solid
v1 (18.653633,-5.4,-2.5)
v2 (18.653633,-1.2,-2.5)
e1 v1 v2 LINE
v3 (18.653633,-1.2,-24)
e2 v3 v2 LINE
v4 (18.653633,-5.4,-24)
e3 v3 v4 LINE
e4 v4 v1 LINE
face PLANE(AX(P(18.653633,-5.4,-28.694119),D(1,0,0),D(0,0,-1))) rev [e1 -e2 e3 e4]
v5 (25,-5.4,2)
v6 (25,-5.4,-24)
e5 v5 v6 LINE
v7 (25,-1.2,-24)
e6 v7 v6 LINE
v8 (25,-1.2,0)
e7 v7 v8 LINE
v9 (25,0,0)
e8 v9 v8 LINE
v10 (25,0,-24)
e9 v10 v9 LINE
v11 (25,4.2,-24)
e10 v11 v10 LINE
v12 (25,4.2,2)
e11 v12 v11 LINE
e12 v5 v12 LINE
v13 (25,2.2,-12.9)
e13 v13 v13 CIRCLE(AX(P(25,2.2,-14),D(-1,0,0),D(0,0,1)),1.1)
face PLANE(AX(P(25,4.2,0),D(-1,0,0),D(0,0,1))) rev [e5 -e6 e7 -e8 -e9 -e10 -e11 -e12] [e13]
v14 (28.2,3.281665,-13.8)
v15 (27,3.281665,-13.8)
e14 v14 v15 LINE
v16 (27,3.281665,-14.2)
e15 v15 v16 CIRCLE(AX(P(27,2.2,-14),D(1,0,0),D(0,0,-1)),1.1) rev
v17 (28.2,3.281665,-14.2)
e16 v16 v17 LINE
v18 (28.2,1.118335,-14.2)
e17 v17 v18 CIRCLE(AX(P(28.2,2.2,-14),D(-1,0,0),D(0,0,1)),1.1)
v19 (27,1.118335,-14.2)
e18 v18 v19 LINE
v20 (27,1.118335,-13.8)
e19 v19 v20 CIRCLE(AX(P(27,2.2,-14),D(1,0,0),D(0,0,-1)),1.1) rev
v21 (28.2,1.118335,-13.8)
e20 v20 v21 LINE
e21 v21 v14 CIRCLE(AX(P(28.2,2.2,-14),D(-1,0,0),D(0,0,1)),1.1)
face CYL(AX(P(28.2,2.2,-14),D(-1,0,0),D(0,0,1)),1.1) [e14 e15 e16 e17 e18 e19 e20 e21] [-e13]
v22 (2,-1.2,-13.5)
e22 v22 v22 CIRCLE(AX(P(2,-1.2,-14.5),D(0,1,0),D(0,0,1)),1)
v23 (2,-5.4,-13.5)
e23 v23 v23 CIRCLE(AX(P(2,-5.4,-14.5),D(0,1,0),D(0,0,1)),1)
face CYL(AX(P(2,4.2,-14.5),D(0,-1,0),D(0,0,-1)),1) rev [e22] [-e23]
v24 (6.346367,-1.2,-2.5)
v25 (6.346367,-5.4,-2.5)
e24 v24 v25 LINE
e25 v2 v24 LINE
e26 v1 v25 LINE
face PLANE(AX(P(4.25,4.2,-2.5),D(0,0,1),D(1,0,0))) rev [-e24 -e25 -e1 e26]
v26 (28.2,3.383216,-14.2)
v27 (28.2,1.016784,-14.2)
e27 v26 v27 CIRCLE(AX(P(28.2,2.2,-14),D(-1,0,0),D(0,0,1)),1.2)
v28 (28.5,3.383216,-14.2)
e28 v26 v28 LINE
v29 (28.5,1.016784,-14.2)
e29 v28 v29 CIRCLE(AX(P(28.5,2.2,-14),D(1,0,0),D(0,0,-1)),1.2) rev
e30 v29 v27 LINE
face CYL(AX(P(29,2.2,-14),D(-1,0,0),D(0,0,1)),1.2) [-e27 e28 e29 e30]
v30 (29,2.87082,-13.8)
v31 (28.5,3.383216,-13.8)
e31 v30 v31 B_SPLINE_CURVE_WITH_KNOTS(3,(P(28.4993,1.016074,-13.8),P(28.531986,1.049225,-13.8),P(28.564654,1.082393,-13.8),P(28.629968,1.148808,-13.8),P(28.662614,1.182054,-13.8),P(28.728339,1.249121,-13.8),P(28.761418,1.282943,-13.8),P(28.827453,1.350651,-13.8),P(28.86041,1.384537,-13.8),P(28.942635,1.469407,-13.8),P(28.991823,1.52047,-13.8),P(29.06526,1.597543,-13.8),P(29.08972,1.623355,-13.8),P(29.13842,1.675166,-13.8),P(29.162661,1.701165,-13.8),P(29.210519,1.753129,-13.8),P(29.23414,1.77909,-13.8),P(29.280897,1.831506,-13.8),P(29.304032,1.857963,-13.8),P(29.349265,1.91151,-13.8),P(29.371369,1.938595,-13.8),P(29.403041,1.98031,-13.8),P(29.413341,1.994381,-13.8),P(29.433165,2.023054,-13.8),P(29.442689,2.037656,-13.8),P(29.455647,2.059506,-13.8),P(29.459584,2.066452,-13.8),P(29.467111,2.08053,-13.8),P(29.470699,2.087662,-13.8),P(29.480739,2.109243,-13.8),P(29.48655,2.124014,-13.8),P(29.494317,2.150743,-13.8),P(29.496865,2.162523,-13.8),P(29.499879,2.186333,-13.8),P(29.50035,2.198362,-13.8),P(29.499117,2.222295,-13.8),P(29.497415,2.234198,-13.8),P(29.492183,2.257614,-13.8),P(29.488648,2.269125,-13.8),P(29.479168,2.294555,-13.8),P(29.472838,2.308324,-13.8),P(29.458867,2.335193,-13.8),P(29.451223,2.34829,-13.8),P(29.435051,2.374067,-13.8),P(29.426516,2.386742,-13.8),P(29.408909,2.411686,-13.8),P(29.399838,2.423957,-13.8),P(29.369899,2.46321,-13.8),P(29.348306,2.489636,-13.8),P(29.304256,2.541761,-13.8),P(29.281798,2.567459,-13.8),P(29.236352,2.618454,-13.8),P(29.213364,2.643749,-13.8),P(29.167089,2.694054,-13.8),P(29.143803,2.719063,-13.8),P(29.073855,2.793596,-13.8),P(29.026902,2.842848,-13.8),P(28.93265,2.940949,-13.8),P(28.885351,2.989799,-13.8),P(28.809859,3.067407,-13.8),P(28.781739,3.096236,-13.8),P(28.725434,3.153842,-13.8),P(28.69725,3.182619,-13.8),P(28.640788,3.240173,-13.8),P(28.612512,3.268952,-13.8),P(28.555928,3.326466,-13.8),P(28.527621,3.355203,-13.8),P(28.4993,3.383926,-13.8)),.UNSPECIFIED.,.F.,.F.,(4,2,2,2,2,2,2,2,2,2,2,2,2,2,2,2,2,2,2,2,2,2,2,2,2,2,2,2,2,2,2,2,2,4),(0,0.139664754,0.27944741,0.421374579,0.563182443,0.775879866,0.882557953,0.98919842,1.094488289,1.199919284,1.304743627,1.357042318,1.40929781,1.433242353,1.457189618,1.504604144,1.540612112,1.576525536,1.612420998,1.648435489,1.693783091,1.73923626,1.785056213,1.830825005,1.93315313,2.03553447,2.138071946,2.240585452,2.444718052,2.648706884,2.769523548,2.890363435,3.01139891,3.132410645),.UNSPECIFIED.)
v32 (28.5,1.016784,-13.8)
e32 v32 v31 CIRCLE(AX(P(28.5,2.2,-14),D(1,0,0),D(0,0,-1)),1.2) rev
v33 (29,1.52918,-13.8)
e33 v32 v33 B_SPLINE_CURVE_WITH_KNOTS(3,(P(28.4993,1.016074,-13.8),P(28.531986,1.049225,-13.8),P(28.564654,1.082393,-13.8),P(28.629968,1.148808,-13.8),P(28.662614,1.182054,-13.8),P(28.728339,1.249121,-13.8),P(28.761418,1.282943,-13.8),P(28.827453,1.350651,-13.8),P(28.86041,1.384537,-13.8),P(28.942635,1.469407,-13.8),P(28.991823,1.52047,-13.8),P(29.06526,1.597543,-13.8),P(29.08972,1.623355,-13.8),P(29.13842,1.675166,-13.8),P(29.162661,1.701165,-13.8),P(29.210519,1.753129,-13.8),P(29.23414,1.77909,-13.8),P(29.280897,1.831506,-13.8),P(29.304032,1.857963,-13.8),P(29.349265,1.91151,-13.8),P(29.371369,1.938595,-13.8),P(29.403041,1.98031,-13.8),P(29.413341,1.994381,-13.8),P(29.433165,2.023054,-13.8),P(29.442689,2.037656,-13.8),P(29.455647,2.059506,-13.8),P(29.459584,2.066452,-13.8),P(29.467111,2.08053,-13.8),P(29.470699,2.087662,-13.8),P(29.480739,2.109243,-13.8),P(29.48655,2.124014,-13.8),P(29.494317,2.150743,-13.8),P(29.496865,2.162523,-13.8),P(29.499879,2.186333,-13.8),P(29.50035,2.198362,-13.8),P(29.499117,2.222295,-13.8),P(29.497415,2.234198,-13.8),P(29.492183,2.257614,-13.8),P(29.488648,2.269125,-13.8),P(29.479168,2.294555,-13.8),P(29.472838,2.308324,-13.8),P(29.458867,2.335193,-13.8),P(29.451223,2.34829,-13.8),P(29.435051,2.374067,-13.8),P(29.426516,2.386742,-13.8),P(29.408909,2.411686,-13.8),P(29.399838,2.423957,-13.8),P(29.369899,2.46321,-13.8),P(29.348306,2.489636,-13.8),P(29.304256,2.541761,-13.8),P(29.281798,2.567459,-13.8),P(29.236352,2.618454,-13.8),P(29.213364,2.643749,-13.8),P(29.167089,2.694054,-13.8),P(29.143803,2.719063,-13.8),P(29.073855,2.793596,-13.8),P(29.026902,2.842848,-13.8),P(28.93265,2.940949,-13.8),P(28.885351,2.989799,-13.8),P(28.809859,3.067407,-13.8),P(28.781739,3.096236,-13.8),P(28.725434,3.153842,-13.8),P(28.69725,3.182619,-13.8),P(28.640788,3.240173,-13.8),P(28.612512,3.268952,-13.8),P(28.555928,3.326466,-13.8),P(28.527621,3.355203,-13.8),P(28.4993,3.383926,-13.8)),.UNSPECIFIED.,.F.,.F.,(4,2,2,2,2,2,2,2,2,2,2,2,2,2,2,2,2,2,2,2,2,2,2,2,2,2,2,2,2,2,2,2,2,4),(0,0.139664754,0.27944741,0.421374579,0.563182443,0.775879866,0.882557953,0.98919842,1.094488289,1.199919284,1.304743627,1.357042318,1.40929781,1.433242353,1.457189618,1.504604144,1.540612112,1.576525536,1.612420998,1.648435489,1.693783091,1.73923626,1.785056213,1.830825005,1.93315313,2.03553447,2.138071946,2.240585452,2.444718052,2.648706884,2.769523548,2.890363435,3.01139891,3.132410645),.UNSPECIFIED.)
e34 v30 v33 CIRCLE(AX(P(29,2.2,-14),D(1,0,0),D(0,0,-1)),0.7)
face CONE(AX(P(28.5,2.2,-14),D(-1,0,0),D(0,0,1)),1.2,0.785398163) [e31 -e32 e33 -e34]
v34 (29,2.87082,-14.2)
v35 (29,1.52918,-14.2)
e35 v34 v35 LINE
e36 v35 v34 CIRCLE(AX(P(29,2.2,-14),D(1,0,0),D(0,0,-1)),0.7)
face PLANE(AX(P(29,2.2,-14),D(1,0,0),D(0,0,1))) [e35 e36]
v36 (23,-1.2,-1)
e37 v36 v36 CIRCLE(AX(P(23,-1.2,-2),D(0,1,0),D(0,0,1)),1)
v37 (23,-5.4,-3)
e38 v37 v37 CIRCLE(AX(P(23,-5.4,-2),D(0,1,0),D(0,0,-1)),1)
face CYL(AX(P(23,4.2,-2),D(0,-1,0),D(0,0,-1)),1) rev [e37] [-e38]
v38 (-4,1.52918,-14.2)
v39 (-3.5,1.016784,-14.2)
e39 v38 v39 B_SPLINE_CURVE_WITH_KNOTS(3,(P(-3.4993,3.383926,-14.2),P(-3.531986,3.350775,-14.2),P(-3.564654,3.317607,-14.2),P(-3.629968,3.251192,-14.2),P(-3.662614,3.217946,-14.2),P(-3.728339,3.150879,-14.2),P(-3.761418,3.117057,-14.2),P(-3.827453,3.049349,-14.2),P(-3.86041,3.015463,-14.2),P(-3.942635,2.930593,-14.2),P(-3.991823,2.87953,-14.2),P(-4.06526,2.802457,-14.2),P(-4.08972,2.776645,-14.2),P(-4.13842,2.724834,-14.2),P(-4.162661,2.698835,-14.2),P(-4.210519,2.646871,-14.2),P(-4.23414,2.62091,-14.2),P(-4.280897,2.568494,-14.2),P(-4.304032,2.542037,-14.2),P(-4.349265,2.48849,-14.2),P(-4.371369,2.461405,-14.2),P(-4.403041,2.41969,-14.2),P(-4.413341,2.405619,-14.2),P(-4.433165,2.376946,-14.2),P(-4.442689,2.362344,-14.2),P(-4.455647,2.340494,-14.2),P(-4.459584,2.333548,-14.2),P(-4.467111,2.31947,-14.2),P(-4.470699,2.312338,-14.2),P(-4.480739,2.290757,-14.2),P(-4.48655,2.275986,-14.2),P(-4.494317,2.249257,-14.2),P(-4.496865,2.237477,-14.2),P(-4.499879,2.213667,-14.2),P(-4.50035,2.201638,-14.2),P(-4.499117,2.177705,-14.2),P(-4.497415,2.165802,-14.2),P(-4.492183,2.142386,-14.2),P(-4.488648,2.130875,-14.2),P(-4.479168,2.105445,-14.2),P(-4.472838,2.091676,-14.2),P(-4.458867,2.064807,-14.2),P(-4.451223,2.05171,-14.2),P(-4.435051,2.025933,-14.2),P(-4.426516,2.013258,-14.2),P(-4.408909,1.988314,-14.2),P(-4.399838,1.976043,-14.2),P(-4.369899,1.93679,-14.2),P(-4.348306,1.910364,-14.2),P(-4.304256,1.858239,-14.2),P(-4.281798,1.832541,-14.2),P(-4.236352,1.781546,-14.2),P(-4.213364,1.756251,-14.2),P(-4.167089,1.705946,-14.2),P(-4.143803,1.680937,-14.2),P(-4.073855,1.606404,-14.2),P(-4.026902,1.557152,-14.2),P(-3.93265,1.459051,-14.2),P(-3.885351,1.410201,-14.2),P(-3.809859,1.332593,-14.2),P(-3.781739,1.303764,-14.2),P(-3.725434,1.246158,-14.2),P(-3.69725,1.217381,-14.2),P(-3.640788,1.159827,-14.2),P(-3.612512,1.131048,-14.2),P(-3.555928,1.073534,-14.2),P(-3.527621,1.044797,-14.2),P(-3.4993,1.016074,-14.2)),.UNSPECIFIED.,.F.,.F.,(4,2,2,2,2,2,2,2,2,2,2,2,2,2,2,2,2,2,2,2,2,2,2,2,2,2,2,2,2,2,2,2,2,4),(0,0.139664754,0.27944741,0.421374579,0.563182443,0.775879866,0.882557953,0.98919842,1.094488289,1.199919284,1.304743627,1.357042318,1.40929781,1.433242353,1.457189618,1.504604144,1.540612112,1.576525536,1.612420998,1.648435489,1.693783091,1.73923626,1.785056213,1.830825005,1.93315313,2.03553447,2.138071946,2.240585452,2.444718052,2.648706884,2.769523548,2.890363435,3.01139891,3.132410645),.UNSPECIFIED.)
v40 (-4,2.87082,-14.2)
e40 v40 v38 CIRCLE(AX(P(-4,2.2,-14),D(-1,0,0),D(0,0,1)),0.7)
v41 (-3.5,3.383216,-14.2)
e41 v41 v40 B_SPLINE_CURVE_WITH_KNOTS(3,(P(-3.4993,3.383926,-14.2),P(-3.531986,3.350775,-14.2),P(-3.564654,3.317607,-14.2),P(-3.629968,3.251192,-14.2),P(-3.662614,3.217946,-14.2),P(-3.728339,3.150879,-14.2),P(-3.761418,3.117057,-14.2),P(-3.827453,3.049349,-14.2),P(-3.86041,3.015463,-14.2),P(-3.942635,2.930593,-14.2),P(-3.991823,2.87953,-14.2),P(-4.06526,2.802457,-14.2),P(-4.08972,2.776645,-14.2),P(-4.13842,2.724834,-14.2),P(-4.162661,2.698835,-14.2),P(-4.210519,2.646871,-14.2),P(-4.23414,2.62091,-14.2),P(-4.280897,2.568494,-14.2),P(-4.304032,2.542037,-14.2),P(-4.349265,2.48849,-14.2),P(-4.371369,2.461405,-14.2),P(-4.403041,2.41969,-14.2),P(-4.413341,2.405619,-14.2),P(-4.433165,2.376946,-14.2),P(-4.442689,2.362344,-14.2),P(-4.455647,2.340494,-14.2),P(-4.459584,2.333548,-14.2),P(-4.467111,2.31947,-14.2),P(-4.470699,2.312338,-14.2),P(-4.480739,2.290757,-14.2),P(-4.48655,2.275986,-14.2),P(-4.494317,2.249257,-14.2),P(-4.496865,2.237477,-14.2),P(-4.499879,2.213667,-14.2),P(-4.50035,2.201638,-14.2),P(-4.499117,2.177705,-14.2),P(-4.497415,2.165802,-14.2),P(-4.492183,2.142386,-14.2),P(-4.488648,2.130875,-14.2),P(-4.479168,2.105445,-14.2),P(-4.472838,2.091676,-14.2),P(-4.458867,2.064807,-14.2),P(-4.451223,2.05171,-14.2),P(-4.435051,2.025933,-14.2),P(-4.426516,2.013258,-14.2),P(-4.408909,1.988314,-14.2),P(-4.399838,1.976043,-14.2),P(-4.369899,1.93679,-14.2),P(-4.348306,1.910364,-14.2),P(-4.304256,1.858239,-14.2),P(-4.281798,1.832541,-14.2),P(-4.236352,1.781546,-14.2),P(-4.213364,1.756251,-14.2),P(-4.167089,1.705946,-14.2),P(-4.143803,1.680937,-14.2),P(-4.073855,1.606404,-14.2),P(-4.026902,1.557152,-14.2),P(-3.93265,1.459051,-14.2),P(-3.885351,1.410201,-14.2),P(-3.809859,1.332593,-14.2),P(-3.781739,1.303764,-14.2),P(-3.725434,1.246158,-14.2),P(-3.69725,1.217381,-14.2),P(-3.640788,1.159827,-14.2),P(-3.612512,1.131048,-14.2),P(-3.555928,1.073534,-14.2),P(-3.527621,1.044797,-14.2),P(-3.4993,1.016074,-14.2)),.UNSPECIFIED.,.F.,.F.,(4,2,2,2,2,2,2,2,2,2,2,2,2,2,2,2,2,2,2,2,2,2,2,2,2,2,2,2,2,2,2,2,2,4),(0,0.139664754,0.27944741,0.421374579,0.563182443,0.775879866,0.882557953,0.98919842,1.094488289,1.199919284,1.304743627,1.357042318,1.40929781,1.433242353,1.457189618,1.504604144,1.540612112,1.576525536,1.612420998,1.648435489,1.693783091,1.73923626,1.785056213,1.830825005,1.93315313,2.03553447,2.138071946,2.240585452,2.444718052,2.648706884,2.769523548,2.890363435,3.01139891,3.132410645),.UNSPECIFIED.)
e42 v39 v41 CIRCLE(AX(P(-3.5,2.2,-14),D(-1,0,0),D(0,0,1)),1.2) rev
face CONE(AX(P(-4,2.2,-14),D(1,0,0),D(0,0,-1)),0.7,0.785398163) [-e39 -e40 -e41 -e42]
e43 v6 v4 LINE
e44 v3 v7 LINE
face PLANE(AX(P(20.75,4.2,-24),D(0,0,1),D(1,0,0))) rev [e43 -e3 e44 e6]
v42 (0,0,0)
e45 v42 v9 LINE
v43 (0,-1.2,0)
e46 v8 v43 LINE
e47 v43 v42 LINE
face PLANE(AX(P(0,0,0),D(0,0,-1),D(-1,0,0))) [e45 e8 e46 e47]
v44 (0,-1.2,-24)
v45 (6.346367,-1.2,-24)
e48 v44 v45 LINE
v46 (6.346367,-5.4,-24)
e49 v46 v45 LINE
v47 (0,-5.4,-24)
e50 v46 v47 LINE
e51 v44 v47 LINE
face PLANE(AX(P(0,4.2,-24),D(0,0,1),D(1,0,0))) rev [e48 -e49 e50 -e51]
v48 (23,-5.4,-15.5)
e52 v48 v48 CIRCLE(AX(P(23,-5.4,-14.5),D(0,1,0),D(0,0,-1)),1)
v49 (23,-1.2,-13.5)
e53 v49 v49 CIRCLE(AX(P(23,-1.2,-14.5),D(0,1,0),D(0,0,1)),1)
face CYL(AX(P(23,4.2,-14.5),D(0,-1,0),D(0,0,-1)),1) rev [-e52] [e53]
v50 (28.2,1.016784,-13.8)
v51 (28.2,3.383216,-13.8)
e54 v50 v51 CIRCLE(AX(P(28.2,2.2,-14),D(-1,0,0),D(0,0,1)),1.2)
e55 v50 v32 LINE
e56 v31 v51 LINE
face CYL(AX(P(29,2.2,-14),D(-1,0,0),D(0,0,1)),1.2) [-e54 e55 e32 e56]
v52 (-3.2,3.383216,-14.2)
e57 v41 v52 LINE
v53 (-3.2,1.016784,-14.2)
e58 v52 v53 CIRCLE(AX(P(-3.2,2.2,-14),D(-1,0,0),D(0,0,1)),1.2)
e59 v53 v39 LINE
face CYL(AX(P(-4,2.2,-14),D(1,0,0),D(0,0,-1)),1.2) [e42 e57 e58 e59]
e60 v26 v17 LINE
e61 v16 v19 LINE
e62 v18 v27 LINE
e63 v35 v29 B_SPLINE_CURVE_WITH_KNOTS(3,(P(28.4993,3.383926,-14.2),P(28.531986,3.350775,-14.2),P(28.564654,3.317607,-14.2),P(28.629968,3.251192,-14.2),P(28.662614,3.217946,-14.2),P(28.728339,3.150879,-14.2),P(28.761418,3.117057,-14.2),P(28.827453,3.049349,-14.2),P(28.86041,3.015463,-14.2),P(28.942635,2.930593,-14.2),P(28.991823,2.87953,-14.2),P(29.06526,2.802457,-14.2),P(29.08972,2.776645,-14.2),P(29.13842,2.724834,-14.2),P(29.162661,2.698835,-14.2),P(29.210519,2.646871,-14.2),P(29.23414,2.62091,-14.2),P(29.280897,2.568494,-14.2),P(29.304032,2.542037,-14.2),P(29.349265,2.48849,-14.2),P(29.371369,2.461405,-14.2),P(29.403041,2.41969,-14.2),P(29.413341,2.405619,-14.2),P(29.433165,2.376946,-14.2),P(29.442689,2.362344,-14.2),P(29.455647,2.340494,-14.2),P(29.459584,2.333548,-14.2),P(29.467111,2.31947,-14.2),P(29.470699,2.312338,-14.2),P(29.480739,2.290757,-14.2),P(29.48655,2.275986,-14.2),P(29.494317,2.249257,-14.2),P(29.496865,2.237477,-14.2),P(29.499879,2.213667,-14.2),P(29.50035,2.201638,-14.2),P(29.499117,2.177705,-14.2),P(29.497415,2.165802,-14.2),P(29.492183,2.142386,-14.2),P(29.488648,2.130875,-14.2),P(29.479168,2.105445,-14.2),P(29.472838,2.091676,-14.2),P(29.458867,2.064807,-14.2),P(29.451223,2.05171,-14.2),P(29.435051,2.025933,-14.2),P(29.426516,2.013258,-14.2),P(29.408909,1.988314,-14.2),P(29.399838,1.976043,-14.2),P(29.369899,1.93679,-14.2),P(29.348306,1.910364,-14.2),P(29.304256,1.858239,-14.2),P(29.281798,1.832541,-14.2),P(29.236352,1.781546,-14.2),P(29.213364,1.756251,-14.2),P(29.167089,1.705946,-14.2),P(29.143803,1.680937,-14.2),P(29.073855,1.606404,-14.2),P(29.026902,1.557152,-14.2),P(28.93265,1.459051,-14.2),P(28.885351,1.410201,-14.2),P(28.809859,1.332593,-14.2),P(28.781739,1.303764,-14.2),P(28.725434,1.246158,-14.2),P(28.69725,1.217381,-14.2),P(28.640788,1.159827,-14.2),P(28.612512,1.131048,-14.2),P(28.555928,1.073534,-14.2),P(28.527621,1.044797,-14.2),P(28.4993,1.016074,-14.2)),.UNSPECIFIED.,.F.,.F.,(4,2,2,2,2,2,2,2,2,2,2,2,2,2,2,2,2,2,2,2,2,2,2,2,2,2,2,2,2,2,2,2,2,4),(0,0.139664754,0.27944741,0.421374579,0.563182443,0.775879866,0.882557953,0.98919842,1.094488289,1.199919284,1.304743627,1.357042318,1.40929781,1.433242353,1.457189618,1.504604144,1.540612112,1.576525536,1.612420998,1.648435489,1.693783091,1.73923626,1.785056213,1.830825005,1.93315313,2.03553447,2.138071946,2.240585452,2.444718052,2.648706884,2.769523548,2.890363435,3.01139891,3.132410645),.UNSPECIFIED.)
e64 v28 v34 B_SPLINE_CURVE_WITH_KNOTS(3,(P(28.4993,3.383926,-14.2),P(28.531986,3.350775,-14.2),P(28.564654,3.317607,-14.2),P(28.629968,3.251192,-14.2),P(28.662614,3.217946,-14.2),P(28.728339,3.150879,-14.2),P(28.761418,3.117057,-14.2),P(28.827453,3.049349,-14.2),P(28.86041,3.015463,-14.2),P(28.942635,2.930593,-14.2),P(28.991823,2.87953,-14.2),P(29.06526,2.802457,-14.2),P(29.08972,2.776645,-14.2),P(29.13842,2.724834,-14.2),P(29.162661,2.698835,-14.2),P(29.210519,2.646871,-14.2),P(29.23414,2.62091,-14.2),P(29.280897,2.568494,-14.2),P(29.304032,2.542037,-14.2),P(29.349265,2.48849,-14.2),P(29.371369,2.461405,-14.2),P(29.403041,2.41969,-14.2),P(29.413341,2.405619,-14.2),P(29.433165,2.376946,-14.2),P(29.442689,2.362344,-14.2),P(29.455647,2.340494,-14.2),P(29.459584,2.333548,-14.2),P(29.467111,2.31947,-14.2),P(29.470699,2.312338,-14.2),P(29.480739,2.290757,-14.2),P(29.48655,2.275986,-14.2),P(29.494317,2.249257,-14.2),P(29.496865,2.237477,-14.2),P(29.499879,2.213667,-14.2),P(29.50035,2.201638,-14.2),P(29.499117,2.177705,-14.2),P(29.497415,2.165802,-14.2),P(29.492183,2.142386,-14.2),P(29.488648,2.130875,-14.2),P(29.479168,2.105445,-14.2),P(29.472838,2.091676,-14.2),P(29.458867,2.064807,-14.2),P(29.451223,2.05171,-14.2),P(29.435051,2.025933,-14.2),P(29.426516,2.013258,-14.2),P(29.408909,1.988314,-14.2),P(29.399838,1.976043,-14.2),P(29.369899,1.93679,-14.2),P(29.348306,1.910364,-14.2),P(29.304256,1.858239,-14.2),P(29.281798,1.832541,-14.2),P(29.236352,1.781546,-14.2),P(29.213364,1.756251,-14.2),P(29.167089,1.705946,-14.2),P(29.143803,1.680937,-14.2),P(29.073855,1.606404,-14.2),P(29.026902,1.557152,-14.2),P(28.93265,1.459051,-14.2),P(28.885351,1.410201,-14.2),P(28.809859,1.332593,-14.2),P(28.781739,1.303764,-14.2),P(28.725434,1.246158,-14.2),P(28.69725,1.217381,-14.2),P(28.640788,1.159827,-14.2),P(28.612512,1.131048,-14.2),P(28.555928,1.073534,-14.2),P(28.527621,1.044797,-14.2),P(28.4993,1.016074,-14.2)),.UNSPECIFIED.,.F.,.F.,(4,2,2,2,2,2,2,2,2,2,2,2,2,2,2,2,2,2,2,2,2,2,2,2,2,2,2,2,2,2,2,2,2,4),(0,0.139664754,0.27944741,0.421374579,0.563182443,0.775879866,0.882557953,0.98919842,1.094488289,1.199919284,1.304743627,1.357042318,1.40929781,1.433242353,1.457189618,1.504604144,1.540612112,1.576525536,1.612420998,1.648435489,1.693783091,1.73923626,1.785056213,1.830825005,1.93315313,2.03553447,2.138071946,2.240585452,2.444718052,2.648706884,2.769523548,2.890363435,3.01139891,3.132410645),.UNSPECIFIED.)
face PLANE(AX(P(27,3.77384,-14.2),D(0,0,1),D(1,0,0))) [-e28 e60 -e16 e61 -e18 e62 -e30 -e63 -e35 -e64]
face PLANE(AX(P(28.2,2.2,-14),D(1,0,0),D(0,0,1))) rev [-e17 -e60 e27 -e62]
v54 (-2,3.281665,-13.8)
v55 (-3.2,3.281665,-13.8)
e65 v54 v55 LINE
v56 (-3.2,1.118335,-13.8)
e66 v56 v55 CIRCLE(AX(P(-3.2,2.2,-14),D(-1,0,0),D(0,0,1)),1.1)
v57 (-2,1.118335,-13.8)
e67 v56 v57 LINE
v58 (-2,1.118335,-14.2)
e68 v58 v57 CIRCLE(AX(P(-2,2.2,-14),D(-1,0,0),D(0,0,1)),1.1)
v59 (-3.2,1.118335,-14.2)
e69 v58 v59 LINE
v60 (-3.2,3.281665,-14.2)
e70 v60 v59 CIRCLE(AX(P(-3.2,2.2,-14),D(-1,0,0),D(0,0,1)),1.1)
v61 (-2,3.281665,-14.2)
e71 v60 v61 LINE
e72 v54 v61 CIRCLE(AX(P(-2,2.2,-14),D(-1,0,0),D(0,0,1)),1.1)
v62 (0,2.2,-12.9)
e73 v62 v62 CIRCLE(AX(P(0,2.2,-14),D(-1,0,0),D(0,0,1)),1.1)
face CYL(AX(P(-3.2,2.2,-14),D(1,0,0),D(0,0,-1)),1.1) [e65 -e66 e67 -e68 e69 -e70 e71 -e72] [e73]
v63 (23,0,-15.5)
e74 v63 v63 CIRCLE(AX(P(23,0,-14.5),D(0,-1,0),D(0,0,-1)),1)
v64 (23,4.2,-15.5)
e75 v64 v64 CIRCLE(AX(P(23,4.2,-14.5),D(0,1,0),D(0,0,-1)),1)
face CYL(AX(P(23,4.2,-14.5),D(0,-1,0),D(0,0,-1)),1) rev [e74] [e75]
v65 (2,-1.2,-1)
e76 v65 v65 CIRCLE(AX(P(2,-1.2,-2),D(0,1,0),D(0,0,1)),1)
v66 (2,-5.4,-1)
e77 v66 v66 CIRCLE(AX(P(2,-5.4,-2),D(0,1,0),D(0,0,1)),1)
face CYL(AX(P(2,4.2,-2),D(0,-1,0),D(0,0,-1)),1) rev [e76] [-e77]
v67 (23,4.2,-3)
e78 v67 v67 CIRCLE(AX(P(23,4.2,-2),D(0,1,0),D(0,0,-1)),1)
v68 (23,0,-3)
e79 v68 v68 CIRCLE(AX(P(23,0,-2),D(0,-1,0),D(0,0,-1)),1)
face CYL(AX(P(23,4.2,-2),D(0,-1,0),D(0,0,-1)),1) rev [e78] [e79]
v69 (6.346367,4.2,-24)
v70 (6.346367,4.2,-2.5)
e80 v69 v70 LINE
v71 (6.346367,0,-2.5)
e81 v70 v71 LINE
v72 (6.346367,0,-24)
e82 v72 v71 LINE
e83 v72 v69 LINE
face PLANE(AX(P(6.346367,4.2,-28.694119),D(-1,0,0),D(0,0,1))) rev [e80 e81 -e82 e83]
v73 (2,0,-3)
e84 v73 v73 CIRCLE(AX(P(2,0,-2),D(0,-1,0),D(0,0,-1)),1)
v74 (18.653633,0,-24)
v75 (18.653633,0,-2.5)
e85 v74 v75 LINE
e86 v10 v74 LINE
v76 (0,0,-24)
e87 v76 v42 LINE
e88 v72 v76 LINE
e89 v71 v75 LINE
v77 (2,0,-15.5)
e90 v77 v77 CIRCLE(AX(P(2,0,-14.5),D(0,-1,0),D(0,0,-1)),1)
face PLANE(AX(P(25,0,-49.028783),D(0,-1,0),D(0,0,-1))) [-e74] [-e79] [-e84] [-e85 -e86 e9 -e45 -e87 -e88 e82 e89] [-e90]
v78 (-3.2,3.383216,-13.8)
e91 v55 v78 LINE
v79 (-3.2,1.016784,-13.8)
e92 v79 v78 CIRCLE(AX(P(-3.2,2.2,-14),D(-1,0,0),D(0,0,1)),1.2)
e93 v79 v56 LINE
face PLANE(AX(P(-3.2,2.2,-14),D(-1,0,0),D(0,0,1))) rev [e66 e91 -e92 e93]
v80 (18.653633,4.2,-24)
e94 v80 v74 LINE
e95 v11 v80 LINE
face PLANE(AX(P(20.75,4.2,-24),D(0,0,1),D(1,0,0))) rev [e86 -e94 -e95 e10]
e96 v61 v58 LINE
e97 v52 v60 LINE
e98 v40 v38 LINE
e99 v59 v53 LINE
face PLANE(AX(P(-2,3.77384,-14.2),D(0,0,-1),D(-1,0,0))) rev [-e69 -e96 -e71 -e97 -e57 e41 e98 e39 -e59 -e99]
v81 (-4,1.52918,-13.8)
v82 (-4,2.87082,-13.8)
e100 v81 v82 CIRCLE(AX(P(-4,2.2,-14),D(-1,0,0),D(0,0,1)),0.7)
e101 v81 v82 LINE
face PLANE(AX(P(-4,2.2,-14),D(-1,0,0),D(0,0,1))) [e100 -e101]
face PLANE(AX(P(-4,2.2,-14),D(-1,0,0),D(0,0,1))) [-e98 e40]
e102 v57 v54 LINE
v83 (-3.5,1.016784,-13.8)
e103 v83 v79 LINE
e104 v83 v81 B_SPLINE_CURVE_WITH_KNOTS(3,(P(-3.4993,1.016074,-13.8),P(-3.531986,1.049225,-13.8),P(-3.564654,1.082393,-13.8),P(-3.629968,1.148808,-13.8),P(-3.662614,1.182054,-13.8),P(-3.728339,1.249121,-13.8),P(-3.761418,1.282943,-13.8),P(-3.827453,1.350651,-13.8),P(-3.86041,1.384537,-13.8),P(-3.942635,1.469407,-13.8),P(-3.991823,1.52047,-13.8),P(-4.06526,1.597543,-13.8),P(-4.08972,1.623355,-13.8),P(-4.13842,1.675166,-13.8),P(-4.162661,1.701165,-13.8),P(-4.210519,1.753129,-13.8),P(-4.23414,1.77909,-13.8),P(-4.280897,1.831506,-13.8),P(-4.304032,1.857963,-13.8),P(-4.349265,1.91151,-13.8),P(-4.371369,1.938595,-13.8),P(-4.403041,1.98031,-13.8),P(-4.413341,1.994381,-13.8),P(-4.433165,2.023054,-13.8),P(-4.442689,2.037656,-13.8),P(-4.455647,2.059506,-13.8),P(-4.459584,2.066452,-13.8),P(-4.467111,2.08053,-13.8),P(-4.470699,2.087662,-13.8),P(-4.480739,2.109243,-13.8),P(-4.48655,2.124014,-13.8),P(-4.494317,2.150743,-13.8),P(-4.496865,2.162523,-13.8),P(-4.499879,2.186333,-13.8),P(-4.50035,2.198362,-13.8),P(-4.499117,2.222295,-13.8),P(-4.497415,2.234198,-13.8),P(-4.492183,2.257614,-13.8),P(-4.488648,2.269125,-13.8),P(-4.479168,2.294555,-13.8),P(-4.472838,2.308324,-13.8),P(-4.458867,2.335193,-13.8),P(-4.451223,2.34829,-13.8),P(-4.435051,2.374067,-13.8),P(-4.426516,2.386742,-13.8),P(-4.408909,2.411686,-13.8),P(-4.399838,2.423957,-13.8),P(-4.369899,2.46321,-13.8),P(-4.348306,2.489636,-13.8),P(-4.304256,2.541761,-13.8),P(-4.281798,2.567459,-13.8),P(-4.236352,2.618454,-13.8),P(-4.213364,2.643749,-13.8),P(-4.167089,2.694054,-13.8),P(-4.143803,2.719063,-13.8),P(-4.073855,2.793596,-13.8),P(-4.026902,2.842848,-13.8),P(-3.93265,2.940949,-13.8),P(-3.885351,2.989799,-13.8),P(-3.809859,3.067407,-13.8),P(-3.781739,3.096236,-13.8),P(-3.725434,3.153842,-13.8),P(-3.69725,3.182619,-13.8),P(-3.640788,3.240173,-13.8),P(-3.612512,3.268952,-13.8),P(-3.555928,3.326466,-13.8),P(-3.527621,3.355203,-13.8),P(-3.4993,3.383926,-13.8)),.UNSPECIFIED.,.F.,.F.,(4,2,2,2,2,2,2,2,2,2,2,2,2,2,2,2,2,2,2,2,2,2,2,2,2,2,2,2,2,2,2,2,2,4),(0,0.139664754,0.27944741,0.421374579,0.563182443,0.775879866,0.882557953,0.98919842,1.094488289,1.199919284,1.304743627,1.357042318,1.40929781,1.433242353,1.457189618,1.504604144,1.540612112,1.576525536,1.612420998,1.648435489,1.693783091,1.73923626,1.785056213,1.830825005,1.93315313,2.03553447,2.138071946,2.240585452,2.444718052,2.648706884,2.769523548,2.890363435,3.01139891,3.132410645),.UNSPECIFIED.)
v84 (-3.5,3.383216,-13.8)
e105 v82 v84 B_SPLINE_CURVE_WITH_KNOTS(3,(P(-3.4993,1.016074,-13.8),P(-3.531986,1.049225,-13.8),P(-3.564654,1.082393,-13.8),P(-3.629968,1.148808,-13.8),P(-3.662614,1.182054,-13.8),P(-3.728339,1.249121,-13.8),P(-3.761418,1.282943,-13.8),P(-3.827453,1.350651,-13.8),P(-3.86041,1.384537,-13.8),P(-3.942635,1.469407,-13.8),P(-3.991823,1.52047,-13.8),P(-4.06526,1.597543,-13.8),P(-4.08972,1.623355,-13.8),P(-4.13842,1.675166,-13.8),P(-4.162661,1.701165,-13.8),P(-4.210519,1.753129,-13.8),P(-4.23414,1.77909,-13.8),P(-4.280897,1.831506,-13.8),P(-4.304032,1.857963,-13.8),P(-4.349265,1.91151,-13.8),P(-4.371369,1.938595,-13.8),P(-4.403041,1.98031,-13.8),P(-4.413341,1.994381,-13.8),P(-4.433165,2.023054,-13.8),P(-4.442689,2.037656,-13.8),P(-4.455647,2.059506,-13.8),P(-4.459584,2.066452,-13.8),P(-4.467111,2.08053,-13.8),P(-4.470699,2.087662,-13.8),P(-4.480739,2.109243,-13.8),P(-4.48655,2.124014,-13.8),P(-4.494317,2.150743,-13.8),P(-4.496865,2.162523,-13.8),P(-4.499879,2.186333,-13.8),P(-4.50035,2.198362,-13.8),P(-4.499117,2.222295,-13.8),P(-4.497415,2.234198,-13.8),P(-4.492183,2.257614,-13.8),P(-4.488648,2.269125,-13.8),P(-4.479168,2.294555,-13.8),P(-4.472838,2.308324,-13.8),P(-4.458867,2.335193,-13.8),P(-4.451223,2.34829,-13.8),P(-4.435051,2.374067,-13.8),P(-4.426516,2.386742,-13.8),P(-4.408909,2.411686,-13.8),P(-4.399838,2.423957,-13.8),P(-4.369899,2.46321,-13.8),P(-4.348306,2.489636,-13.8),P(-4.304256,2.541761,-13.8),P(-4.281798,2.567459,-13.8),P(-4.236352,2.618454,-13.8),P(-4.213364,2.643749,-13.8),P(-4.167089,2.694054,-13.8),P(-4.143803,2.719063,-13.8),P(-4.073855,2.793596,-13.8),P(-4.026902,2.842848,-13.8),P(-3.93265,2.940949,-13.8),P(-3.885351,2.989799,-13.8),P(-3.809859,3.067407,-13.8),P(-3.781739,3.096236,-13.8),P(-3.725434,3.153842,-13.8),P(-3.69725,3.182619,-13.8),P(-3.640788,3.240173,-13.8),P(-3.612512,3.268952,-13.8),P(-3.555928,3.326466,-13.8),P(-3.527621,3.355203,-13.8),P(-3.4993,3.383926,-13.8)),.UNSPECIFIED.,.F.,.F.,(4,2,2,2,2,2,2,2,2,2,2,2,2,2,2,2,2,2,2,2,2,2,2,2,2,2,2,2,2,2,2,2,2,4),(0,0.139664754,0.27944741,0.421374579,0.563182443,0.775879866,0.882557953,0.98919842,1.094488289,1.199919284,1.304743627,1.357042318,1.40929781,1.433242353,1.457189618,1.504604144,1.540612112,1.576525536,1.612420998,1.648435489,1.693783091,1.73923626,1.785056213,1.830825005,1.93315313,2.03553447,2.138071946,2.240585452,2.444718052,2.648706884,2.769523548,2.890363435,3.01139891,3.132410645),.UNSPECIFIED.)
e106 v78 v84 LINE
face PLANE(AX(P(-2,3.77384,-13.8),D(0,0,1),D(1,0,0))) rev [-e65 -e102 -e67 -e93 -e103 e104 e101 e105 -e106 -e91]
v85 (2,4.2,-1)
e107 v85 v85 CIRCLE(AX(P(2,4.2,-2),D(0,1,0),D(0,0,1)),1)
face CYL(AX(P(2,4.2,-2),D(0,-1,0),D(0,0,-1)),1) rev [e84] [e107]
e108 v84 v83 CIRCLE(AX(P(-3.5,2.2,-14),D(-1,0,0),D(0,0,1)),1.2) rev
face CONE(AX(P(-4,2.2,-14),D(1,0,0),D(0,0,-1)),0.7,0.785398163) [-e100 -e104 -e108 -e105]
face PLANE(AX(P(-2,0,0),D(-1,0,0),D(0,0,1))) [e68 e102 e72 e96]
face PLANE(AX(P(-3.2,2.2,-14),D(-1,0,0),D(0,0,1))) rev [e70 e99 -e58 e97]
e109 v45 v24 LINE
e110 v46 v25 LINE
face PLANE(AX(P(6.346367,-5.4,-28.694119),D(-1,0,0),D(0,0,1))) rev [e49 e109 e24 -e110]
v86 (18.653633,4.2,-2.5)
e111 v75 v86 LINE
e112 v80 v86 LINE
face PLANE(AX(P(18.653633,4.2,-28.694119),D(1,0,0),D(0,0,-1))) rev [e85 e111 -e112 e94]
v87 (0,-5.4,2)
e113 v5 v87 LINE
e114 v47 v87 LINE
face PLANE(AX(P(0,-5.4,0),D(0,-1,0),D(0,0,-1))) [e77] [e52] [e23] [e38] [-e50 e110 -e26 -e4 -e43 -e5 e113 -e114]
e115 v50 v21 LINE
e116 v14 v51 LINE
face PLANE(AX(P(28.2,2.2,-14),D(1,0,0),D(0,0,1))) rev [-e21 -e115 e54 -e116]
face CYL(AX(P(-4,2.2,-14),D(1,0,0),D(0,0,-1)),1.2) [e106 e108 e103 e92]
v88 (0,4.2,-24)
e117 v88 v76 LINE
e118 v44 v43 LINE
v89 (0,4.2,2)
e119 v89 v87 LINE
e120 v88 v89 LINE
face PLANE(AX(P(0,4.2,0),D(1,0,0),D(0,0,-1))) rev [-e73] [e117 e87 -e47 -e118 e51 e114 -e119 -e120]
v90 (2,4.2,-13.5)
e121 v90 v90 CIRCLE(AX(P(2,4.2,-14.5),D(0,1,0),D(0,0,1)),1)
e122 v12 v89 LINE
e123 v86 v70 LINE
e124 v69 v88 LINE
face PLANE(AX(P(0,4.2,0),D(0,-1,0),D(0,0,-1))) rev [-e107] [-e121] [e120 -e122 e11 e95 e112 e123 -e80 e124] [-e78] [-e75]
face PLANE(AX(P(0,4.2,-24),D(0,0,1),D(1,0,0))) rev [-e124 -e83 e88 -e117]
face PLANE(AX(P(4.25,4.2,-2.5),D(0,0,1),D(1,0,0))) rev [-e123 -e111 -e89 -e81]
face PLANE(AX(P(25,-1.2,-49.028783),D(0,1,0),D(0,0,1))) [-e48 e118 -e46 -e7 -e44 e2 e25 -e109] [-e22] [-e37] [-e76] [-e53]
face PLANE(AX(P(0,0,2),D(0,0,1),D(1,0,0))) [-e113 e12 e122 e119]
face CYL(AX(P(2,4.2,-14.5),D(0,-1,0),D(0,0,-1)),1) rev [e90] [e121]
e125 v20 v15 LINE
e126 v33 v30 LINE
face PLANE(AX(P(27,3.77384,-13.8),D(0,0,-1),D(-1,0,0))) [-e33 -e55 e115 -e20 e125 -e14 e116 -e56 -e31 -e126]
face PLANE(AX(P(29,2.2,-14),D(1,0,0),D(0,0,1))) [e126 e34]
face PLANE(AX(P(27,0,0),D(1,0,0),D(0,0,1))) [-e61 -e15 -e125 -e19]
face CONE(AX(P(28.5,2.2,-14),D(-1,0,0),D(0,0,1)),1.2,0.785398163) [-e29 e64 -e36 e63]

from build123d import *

# Parameters (mm, degrees)
SKETCH1_R           = 1
BOSS_EXTRUDE1_DEPTH = 4.2
SKETCH2_R           = 1.2
BOSS_EXTRUDE2_DEPTH = 4
SKETCH3_W           = 25
SKETCH3_H           = 4.2
BOSS_EXTRUDE3_DEPTH = 2
SKETCH4_W           = 25
SKETCH4_H           = 2
BOSS_EXTRUDE4_DEPTH = 0.6
BOSS_EXTRUDE5_START = -5.4
SKETCH1_3_R         = 1
BOSS_EXTRUDE5_DEPTH = 5.4
SKETCH4_2_W         = 25
SKETCH4_2_H         = 2
BOSS_EXTRUDE6_DEPTH = 5.4
CUT_EXTRUDE2_REACH  = 35.413
SKETCH5_W           = 25
SKETCH5_H           = 1.2
SKETCH6_W           = 2.096367106
SKETCH6_H           = 4.2
BOSS_EXTRUDE8_DEPTH = 21.5
SKETCH5_2_W         = 25
SKETCH5_2_H         = 1.2
CUT_EXTRUDE4_DEPTH  = 2.5
SKETCH8_R           = 1.2
SKETCH8_R_2         = 1.1
CUT_EXTRUDE5_DEPTH  = 3.2
CHAMFER1_SIZE       = 0.5
SKETCH10_W          = 0.4
SKETCH10_H          = 3.208969491
CUT_EXTRUDE6_DEPTH  = 2


# Read off the part's stored shape, not the designer's step: Mirror1
with BuildPart() as part:
    # Sketch1 → Boss-Extrude1 (new body)
    with BuildSketch(Plane(origin=(0, 0, 0), x_dir=(1, 0, 0), z_dir=(0, 1, 0))):
        Polygon((0, 0), (25, 0), (25, 24), (20.75, 24), (20.75, 2.5), (4.25, 2.5), (4.25, 24), (0, 24), align=None)
        with Locations(Location((2, 14.5, 0), (0, 0, 270))):
            Circle(SKETCH1_R, mode=Mode.SUBTRACT)
        with Locations(Location((2, 2, 0), (0, 0, 270))):
            Circle(SKETCH1_R, mode=Mode.SUBTRACT)
        with Locations(Location((23, 2, 0), (0, 0, 90))):
            Circle(SKETCH1_R, mode=Mode.SUBTRACT)
        with Locations(Location((23, 14.5, 0), (0, 0, 90))):
            Circle(SKETCH1_R, mode=Mode.SUBTRACT)
    extrude(amount=BOSS_EXTRUDE1_DEPTH)

    # Sketch2 → Boss-Extrude2 (add)
    with BuildSketch(Plane.ZY):
        with Locations((-14, 2.2)):
            Circle(SKETCH2_R)
    extrude(amount=BOSS_EXTRUDE2_DEPTH)

    # Sketch3 → Boss-Extrude3 (add)
    with BuildSketch(Plane.XY):
        with Locations((12.5, 2.1)):
            Rectangle(SKETCH3_W, SKETCH3_H)
    extrude(amount=BOSS_EXTRUDE3_DEPTH)

    # Sketch4 → Boss-Extrude4 (add)
    with BuildSketch(Plane.XZ):
        with Locations((12.5, 1)):
            Rectangle(SKETCH4_W, SKETCH4_H)
    extrude(amount=BOSS_EXTRUDE4_DEPTH)

    # Sketch1<3> → Boss-Extrude5 (add)
    with BuildSketch(Plane(origin=(0, 0, 0), x_dir=(1, 0, 0), z_dir=(0, 1, 0)).offset(BOSS_EXTRUDE5_START)):
        Polygon((0, 0), (25, 0), (25, 24), (20.75, 24), (20.75, 2.5), (4.25, 2.5), (4.25, 24), (0, 24), align=None)
        with Locations(Location((2, 14.5, 0), (0, 0, 270))):
            Circle(SKETCH1_3_R, mode=Mode.SUBTRACT)
        with Locations(Location((2, 2, 0), (0, 0, 270))):
            Circle(SKETCH1_3_R, mode=Mode.SUBTRACT)
        with Locations(Location((23, 2, 0), (0, 0, 90))):
            Circle(SKETCH1_3_R, mode=Mode.SUBTRACT)
        with Locations(Location((23, 14.5, 0), (0, 0, 90))):
            Circle(SKETCH1_3_R, mode=Mode.SUBTRACT)
    extrude(amount=BOSS_EXTRUDE5_DEPTH)

    # Sketch4<2> → Boss-Extrude6 (add)
    with BuildSketch(Plane.XZ):
        with Locations((12.5, 1)):
            Rectangle(SKETCH4_2_W, SKETCH4_2_H)
    extrude(amount=BOSS_EXTRUDE6_DEPTH)

    # Cut-Extrude2: up to this face of the body (flat: up to its plane)
    cut_extrude2_end = Plane(part.part.faces().sort_by_distance((22.875, -0.6, -24))[0])
    # Sketch5 → Cut-Extrude2 (cut, up to the picked face)
    with BuildSketch(Plane(origin=(0, 0, -2.5), x_dir=(-1, 0, 0), z_dir=(0, 0, -1)), mode=Mode.PRIVATE) as cut_extrude2_sk1:
        with Locations((-12.5, -0.6)):
            Rectangle(SKETCH5_W, SKETCH5_H)
    cut_extrude2_tool1 = split(extrude(cut_extrude2_sk1.sketch, amount=CUT_EXTRUDE2_REACH, mode=Mode.PRIVATE), bisect_by=cut_extrude2_end, keep=Keep.BOTH, mode=Mode.PRIVATE)
    add(cut_extrude2_tool1.solids().sort_by(Axis((12.5, -0.6, -2.5), (0, 0, -1)))[0], mode=Mode.SUBTRACT)

    # Sketch6 → Boss-Extrude8 (add)
    with BuildSketch(Plane(origin=(0, 0, -2.5), x_dir=(-1, 0, 0), z_dir=(0, 0, -1))):
        with Locations((-19.701816447, 2.1)):
            Rectangle(SKETCH6_W, SKETCH6_H)
        with Locations((-5.298183553, 2.1)):
            Rectangle(SKETCH6_W, SKETCH6_H)
        with Locations((-5.298183553, -3.3)):
            Rectangle(SKETCH6_W, SKETCH6_H)
        with Locations((-19.701816447, -3.3)):
            Rectangle(SKETCH6_W, SKETCH6_H)
    extrude(amount=BOSS_EXTRUDE8_DEPTH)

    # Sketch5<2> → Cut-Extrude4 (cut)
    with BuildSketch(Plane(origin=(0, 0, -2.5), x_dir=(-1, 0, 0), z_dir=(0, 0, -1))):
        with Locations((-12.5, -0.6)):
            Rectangle(SKETCH5_2_W, SKETCH5_2_H)
    extrude(amount=-CUT_EXTRUDE4_DEPTH, mode=Mode.SUBTRACT)

    # Sketch8 → Cut-Extrude5 (cut)
    with BuildSketch(Plane.ZY):
        with Locations((-14, 2.2)):
            Circle(SKETCH8_R)
        with Locations((-14, 2.2)):
            Circle(SKETCH8_R_2, mode=Mode.SUBTRACT)
    extrude(amount=CUT_EXTRUDE5_DEPTH, mode=Mode.SUBTRACT)

    # Chamfer1
    chamfer1_edges = [part.edges().sort_by_distance(p)[0] for p in [
        (-4, 2.2, -15.2),
    ]]
    chamfer(chamfer1_edges, length=CHAMFER1_SIZE)

    # Sketch10 → Cut-Extrude6 (cut)
    with BuildSketch(Plane.ZY.offset(4)):
        with Locations((-14, 2.169354983)):
            Rectangle(SKETCH10_W, SKETCH10_H)
    extrude(amount=-CUT_EXTRUDE6_DEPTH, mode=Mode.SUBTRACT)

    # Mirror1: part across plane


with BuildPart() as part_1:
    add(part.part)
    add(part.part.mirror(Plane.ZY.offset(-12.5)))


solid = part_1.part
